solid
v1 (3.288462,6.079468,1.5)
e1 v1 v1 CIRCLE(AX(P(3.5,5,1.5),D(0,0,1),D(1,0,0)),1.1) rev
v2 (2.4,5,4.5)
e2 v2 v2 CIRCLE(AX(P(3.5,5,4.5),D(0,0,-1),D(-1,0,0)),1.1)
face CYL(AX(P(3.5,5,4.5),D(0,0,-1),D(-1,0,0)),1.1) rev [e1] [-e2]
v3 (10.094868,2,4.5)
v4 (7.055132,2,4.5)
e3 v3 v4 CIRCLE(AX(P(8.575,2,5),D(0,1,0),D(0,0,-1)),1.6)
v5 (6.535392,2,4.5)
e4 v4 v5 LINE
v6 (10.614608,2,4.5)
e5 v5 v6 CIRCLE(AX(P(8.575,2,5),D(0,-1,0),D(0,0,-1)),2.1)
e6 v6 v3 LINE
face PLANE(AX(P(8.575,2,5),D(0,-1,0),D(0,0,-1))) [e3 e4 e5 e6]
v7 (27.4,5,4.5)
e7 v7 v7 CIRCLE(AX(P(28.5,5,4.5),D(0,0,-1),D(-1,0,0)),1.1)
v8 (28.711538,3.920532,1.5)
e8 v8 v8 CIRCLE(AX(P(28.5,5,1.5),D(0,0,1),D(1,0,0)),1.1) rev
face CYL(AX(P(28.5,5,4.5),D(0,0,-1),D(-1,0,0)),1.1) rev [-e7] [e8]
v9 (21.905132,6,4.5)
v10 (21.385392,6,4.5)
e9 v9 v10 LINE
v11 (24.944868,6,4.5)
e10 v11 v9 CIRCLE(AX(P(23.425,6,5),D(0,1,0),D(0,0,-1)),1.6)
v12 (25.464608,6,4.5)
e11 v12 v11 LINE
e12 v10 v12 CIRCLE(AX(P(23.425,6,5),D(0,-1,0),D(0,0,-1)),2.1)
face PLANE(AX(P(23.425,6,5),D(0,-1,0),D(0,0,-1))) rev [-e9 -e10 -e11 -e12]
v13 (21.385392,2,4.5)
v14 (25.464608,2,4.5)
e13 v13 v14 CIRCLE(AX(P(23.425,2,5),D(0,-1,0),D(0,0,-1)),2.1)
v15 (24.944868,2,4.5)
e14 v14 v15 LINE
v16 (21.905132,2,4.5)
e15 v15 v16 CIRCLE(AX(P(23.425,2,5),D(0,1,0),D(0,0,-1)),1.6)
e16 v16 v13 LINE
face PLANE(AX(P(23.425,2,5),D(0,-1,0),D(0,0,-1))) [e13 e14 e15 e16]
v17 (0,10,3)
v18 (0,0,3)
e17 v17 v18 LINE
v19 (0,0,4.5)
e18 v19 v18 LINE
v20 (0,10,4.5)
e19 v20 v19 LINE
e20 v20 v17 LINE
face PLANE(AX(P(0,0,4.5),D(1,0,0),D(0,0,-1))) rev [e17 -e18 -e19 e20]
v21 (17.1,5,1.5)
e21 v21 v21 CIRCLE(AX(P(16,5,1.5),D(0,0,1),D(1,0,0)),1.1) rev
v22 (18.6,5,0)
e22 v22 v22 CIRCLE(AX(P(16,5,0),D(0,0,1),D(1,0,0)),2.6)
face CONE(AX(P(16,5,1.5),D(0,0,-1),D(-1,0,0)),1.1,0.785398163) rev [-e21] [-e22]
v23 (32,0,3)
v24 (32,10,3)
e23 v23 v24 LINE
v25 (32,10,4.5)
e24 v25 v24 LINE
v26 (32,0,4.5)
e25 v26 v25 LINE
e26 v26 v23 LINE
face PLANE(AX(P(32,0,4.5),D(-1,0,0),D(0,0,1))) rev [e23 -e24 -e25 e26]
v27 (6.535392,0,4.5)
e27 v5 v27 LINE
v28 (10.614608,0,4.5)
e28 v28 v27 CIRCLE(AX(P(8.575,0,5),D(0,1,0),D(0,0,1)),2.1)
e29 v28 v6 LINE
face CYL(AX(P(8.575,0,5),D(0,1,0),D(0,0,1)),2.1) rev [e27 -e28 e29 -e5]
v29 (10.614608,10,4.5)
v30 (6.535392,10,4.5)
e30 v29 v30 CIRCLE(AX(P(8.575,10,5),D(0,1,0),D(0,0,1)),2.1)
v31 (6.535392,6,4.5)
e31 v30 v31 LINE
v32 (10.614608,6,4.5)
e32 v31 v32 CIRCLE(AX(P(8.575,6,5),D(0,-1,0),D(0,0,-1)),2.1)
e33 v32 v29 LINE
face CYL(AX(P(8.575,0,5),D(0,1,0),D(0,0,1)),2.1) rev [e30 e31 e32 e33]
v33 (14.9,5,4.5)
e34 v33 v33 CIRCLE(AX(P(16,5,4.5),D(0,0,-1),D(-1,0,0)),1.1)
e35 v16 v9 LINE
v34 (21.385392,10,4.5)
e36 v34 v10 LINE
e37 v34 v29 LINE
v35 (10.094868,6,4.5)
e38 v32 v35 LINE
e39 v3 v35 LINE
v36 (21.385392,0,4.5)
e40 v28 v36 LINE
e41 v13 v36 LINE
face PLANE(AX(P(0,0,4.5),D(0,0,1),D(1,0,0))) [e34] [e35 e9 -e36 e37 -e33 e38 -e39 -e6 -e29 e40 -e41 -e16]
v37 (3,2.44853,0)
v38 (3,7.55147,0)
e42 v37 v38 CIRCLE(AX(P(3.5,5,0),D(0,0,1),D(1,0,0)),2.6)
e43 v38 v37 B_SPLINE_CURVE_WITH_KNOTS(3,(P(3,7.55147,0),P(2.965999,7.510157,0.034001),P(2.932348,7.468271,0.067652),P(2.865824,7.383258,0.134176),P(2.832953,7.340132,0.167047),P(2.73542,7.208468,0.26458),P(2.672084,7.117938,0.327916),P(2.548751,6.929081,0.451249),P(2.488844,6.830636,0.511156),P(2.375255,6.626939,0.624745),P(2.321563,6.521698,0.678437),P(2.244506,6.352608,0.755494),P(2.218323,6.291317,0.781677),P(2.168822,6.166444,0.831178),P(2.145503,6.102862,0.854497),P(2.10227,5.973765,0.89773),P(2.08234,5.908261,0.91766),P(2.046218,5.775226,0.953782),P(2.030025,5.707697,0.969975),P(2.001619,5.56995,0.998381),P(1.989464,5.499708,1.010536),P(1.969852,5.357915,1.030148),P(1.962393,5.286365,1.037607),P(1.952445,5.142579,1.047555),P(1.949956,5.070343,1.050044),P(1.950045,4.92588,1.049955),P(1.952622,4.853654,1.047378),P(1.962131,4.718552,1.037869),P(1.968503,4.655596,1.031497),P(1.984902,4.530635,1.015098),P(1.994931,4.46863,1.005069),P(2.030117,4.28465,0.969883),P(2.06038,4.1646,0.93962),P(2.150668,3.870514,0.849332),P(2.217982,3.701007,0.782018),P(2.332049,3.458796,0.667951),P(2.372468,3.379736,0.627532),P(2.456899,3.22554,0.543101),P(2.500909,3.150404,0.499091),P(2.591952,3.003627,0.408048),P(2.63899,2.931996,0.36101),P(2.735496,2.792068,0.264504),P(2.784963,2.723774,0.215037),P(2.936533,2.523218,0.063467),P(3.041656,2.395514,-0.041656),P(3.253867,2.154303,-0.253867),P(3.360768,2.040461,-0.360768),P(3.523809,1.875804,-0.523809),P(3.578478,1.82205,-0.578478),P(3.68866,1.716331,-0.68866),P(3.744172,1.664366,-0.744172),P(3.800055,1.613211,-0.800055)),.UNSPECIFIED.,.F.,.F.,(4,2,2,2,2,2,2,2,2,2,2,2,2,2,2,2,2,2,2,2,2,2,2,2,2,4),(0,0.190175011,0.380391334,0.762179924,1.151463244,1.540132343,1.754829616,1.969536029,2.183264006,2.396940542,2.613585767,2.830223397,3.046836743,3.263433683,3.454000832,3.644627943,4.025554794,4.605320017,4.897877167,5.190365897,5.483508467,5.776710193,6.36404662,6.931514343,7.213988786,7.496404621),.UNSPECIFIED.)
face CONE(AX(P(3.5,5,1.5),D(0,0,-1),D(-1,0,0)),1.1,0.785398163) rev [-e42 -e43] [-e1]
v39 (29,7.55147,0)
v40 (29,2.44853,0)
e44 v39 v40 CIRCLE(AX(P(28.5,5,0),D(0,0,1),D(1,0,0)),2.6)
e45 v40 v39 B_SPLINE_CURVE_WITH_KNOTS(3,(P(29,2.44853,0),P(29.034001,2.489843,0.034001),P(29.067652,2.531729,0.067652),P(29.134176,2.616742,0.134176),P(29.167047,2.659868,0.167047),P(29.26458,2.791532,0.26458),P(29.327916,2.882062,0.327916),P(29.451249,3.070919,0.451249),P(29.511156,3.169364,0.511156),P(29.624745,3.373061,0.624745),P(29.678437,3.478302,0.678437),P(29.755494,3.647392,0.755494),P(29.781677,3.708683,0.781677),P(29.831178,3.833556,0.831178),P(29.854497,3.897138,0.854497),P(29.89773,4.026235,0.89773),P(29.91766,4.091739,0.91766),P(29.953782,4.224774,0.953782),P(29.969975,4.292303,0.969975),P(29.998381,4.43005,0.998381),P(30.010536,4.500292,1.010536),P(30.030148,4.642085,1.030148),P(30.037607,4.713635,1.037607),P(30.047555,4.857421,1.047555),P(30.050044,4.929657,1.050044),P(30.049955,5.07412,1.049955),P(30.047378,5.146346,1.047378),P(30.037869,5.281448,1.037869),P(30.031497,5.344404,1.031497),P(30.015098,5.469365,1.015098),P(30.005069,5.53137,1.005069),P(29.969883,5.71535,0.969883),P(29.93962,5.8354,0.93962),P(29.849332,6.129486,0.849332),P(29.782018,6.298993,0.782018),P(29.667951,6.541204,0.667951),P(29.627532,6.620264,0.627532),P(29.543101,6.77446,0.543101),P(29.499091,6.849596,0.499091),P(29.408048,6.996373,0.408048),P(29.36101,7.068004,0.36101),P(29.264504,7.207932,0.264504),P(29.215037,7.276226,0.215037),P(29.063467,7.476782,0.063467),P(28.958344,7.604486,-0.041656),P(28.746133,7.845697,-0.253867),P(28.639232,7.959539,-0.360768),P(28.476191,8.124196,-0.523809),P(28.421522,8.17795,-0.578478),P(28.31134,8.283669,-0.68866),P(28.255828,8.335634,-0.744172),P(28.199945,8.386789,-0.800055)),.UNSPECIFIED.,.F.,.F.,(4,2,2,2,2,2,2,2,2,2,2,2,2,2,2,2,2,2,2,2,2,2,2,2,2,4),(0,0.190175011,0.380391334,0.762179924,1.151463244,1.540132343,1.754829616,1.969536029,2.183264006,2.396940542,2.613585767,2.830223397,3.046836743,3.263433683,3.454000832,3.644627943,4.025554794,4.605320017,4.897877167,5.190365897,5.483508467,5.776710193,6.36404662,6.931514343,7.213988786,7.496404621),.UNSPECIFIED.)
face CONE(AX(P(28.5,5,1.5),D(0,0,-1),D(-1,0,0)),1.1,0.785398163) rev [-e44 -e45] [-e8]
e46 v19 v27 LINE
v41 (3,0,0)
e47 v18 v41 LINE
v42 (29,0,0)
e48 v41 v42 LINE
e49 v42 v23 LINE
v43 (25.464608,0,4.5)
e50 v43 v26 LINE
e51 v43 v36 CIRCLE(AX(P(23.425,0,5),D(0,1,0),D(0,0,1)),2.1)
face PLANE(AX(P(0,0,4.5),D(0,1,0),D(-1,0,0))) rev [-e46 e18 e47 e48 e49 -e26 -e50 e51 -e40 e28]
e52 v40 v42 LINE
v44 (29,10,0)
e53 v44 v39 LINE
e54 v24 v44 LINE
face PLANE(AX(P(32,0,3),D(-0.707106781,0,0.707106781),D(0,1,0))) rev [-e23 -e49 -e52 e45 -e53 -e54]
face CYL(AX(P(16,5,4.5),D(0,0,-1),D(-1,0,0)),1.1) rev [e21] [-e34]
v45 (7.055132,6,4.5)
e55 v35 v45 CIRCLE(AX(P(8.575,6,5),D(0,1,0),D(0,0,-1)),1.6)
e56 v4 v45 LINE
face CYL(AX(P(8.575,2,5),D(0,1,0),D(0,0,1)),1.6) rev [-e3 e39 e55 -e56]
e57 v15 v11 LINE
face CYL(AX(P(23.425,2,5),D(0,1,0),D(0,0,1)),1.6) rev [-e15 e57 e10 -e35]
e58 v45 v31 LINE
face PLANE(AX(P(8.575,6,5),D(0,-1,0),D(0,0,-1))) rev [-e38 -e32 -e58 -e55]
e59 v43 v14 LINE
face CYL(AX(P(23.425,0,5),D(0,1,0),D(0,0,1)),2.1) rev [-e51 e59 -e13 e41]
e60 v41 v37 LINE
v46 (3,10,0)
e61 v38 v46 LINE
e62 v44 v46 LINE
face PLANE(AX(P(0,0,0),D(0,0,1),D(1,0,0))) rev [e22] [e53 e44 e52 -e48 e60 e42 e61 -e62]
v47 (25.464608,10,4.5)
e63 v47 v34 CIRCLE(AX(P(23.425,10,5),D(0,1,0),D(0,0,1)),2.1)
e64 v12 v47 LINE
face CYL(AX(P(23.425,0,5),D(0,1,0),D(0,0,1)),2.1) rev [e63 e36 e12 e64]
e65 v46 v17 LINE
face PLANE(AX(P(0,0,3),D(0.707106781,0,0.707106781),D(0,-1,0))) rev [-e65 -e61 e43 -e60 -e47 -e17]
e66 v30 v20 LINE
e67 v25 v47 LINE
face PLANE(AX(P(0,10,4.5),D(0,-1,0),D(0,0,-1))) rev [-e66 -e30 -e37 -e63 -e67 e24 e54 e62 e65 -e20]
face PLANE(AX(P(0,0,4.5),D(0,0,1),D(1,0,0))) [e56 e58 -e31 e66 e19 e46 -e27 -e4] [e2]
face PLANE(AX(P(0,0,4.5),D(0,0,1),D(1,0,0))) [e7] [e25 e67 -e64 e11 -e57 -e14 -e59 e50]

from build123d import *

# Parameters (mm, degrees)
SKETCH_1_W          = 32
SKETCH_1_H          = 10
EXTRUDE_1_DEPTH     = 4.5
SKETCH_2_R          = 2.1
CUT_EXTRUDE_1_DEPTH = 34.826764551
EXTRUDE_2_DEPTH     = 4
CHAMFER_1_SIZE      = 3
SKETCH_5_R          = 1.1
CUT_EXTRUDE_2_DEPTH = 34.826764551


with BuildPart() as part:
    # Эскиз1 → Бобышка-Вытянуть1 (new body)
    with BuildSketch(Plane.XY):
        with Locations((16, 5)):
            Rectangle(SKETCH_1_W, SKETCH_1_H)
    extrude(amount=EXTRUDE_1_DEPTH)

    # Эскиз2 → Вырез-Вытянуть1 (cut, through all)
    with BuildSketch(Plane(origin=(0, 10, 0), x_dir=(1, 0, 0), z_dir=(0, 1, 0))):
        with Locations((8.575, -5)):
            Circle(SKETCH_2_R)
        with Locations((23.425, -5)):
            Circle(SKETCH_2_R)
    extrude(amount=-CUT_EXTRUDE_1_DEPTH, mode=Mode.SUBTRACT)

    # Эскиз4 → Бобышка-Вытянуть2 (add)
    with BuildSketch(Plane.XZ.offset(-6)):
        with BuildLine():
            Line((6.535392195, 4.5), (7.055131585, 4.5))
            ThreePointArc((7.055131585, 4.5), (8.575, 3.4), (10.094868415, 4.5))
            Line((10.094868415, 4.5), (10.614607805, 4.5))
            ThreePointArc((10.614607805, 4.5), (8.575, 2.9), (6.535392195, 4.5))
        make_face()
        with BuildLine():
            Line((21.385392195, 4.5), (21.905131585, 4.5))
            ThreePointArc((21.905131585, 4.5), (23.425, 3.4), (24.944868415, 4.5))
            Line((24.944868415, 4.5), (25.464607805, 4.5))
            ThreePointArc((25.464607805, 4.5), (23.425, 2.9), (21.385392195, 4.5))
        make_face()
    extrude(amount=EXTRUDE_2_DEPTH)

    # Фаска1
    chamfer_1_edges = [part.edges().sort_by_distance(p)[0] for p in [
        (0, 5, 0),
        (32, 5, 0),
    ]]
    chamfer(chamfer_1_edges, length=CHAMFER_1_SIZE)

    # Эскиз5 → Вырез-Вытянуть2 (cut, through all)
    with BuildSketch(Plane(origin=(0, 0, 0), x_dir=(-1, 0, 0), z_dir=(0, 0, -1))):
        with Locations((-28.5, 5)):
            Circle(SKETCH_5_R)
        with Locations((-16, 5)):
            Circle(SKETCH_5_R)
        with Locations((-3.5, 5)):
            Circle(SKETCH_5_R)
    extrude(amount=-CUT_EXTRUDE_2_DEPTH, mode=Mode.SUBTRACT)

    # Фаска2: read off the stored shape, not the designer's step
    # Фаска2: loft between two sections, ruled curve by curve
    chamfer_2_from = [
        Edge.make_three_point_arc((3.288461538, 6.079468146, 1.5), (4.579468146, 5.211538462, 1.5), (3.711538462, 3.920531854, 1.5)),
        Edge.make_three_point_arc((3.711538462, 3.920531854, 1.5), (2.420531854, 4.788461538, 1.5), (3.288461538, 6.079468146, 1.5)),
    ]
    chamfer_2_to = [
        Edge.make_three_point_arc((2.999999479, 7.551472823, -2.709e-06), (6.051472823, 5.500000521, -2.709e-06), (4.000000521, 2.448527177, -2.709e-06)),
        Edge.make_three_point_arc((4.000000521, 2.448527177, -2.709e-06), (0.948527177, 4.499999479, -2.709e-06), (2.999999479, 7.551472823, -2.709e-06)),
    ]
    chamfer_2 = Solid(Shell([*[Face.make_surface_from_curves(chamfer_2_from[k], chamfer_2_to[k]) for k in range(2)], Face(Wire(chamfer_2_from)), Face(Wire(chamfer_2_to))]))
    add(chamfer_2, mode=Mode.SUBTRACT)

    # Chamfer 2 2: loft between two sections, ruled curve by curve
    chamfer_2_2_from = [
        Edge.make_three_point_arc((17.1, 5, 1.5), (16, 3.9, 1.5), (14.9, 5, 1.5)),
        Edge.make_three_point_arc((14.9, 5, 1.5), (16, 6.1, 1.5), (17.1, 5, 1.5)),
    ]
    chamfer_2_2_to = [
        Edge.make_three_point_arc((18.6, 5, 0), (16, 2.4, 0), (13.4, 5, 0)),
        Edge.make_three_point_arc((13.4, 5, 0), (16, 7.6, 0), (18.6, 5, 0)),
    ]
    chamfer_2_2 = Solid(Shell([*[Face.make_surface_from_curves(chamfer_2_2_from[k], chamfer_2_2_to[k]) for k in range(2)], Face(Wire(chamfer_2_2_from)), Face(Wire(chamfer_2_2_to))]))
    add(chamfer_2_2, mode=Mode.SUBTRACT)

    # Chamfer 2 3: loft between two sections, ruled curve by curve
    chamfer_2_3_from = [
        Edge.make_three_point_arc((28.711538462, 3.920531854, 1.5), (27.420531854, 4.788461538, 1.5), (28.288461538, 6.079468146, 1.5)),
        Edge.make_three_point_arc((28.288461538, 6.079468146, 1.5), (29.579468146, 5.211538462, 1.5), (28.711538462, 3.920531854, 1.5)),
    ]
    chamfer_2_3_to = [
        Edge.make_three_point_arc((29.000000521, 2.448527177, -2.709e-06), (25.948527177, 4.499999479, -2.709e-06), (27.999999479, 7.551472823, -2.709e-06)),
        Edge.make_three_point_arc((27.999999479, 7.551472823, -2.709e-06), (31.051472823, 5.500000521, -2.709e-06), (29.000000521, 2.448527177, -2.709e-06)),
    ]
    chamfer_2_3 = Solid(Shell([*[Face.make_surface_from_curves(chamfer_2_3_from[k], chamfer_2_3_to[k]) for k in range(2)], Face(Wire(chamfer_2_3_from)), Face(Wire(chamfer_2_3_to))]))
    add(chamfer_2_3, mode=Mode.SUBTRACT)


solid = part.part
